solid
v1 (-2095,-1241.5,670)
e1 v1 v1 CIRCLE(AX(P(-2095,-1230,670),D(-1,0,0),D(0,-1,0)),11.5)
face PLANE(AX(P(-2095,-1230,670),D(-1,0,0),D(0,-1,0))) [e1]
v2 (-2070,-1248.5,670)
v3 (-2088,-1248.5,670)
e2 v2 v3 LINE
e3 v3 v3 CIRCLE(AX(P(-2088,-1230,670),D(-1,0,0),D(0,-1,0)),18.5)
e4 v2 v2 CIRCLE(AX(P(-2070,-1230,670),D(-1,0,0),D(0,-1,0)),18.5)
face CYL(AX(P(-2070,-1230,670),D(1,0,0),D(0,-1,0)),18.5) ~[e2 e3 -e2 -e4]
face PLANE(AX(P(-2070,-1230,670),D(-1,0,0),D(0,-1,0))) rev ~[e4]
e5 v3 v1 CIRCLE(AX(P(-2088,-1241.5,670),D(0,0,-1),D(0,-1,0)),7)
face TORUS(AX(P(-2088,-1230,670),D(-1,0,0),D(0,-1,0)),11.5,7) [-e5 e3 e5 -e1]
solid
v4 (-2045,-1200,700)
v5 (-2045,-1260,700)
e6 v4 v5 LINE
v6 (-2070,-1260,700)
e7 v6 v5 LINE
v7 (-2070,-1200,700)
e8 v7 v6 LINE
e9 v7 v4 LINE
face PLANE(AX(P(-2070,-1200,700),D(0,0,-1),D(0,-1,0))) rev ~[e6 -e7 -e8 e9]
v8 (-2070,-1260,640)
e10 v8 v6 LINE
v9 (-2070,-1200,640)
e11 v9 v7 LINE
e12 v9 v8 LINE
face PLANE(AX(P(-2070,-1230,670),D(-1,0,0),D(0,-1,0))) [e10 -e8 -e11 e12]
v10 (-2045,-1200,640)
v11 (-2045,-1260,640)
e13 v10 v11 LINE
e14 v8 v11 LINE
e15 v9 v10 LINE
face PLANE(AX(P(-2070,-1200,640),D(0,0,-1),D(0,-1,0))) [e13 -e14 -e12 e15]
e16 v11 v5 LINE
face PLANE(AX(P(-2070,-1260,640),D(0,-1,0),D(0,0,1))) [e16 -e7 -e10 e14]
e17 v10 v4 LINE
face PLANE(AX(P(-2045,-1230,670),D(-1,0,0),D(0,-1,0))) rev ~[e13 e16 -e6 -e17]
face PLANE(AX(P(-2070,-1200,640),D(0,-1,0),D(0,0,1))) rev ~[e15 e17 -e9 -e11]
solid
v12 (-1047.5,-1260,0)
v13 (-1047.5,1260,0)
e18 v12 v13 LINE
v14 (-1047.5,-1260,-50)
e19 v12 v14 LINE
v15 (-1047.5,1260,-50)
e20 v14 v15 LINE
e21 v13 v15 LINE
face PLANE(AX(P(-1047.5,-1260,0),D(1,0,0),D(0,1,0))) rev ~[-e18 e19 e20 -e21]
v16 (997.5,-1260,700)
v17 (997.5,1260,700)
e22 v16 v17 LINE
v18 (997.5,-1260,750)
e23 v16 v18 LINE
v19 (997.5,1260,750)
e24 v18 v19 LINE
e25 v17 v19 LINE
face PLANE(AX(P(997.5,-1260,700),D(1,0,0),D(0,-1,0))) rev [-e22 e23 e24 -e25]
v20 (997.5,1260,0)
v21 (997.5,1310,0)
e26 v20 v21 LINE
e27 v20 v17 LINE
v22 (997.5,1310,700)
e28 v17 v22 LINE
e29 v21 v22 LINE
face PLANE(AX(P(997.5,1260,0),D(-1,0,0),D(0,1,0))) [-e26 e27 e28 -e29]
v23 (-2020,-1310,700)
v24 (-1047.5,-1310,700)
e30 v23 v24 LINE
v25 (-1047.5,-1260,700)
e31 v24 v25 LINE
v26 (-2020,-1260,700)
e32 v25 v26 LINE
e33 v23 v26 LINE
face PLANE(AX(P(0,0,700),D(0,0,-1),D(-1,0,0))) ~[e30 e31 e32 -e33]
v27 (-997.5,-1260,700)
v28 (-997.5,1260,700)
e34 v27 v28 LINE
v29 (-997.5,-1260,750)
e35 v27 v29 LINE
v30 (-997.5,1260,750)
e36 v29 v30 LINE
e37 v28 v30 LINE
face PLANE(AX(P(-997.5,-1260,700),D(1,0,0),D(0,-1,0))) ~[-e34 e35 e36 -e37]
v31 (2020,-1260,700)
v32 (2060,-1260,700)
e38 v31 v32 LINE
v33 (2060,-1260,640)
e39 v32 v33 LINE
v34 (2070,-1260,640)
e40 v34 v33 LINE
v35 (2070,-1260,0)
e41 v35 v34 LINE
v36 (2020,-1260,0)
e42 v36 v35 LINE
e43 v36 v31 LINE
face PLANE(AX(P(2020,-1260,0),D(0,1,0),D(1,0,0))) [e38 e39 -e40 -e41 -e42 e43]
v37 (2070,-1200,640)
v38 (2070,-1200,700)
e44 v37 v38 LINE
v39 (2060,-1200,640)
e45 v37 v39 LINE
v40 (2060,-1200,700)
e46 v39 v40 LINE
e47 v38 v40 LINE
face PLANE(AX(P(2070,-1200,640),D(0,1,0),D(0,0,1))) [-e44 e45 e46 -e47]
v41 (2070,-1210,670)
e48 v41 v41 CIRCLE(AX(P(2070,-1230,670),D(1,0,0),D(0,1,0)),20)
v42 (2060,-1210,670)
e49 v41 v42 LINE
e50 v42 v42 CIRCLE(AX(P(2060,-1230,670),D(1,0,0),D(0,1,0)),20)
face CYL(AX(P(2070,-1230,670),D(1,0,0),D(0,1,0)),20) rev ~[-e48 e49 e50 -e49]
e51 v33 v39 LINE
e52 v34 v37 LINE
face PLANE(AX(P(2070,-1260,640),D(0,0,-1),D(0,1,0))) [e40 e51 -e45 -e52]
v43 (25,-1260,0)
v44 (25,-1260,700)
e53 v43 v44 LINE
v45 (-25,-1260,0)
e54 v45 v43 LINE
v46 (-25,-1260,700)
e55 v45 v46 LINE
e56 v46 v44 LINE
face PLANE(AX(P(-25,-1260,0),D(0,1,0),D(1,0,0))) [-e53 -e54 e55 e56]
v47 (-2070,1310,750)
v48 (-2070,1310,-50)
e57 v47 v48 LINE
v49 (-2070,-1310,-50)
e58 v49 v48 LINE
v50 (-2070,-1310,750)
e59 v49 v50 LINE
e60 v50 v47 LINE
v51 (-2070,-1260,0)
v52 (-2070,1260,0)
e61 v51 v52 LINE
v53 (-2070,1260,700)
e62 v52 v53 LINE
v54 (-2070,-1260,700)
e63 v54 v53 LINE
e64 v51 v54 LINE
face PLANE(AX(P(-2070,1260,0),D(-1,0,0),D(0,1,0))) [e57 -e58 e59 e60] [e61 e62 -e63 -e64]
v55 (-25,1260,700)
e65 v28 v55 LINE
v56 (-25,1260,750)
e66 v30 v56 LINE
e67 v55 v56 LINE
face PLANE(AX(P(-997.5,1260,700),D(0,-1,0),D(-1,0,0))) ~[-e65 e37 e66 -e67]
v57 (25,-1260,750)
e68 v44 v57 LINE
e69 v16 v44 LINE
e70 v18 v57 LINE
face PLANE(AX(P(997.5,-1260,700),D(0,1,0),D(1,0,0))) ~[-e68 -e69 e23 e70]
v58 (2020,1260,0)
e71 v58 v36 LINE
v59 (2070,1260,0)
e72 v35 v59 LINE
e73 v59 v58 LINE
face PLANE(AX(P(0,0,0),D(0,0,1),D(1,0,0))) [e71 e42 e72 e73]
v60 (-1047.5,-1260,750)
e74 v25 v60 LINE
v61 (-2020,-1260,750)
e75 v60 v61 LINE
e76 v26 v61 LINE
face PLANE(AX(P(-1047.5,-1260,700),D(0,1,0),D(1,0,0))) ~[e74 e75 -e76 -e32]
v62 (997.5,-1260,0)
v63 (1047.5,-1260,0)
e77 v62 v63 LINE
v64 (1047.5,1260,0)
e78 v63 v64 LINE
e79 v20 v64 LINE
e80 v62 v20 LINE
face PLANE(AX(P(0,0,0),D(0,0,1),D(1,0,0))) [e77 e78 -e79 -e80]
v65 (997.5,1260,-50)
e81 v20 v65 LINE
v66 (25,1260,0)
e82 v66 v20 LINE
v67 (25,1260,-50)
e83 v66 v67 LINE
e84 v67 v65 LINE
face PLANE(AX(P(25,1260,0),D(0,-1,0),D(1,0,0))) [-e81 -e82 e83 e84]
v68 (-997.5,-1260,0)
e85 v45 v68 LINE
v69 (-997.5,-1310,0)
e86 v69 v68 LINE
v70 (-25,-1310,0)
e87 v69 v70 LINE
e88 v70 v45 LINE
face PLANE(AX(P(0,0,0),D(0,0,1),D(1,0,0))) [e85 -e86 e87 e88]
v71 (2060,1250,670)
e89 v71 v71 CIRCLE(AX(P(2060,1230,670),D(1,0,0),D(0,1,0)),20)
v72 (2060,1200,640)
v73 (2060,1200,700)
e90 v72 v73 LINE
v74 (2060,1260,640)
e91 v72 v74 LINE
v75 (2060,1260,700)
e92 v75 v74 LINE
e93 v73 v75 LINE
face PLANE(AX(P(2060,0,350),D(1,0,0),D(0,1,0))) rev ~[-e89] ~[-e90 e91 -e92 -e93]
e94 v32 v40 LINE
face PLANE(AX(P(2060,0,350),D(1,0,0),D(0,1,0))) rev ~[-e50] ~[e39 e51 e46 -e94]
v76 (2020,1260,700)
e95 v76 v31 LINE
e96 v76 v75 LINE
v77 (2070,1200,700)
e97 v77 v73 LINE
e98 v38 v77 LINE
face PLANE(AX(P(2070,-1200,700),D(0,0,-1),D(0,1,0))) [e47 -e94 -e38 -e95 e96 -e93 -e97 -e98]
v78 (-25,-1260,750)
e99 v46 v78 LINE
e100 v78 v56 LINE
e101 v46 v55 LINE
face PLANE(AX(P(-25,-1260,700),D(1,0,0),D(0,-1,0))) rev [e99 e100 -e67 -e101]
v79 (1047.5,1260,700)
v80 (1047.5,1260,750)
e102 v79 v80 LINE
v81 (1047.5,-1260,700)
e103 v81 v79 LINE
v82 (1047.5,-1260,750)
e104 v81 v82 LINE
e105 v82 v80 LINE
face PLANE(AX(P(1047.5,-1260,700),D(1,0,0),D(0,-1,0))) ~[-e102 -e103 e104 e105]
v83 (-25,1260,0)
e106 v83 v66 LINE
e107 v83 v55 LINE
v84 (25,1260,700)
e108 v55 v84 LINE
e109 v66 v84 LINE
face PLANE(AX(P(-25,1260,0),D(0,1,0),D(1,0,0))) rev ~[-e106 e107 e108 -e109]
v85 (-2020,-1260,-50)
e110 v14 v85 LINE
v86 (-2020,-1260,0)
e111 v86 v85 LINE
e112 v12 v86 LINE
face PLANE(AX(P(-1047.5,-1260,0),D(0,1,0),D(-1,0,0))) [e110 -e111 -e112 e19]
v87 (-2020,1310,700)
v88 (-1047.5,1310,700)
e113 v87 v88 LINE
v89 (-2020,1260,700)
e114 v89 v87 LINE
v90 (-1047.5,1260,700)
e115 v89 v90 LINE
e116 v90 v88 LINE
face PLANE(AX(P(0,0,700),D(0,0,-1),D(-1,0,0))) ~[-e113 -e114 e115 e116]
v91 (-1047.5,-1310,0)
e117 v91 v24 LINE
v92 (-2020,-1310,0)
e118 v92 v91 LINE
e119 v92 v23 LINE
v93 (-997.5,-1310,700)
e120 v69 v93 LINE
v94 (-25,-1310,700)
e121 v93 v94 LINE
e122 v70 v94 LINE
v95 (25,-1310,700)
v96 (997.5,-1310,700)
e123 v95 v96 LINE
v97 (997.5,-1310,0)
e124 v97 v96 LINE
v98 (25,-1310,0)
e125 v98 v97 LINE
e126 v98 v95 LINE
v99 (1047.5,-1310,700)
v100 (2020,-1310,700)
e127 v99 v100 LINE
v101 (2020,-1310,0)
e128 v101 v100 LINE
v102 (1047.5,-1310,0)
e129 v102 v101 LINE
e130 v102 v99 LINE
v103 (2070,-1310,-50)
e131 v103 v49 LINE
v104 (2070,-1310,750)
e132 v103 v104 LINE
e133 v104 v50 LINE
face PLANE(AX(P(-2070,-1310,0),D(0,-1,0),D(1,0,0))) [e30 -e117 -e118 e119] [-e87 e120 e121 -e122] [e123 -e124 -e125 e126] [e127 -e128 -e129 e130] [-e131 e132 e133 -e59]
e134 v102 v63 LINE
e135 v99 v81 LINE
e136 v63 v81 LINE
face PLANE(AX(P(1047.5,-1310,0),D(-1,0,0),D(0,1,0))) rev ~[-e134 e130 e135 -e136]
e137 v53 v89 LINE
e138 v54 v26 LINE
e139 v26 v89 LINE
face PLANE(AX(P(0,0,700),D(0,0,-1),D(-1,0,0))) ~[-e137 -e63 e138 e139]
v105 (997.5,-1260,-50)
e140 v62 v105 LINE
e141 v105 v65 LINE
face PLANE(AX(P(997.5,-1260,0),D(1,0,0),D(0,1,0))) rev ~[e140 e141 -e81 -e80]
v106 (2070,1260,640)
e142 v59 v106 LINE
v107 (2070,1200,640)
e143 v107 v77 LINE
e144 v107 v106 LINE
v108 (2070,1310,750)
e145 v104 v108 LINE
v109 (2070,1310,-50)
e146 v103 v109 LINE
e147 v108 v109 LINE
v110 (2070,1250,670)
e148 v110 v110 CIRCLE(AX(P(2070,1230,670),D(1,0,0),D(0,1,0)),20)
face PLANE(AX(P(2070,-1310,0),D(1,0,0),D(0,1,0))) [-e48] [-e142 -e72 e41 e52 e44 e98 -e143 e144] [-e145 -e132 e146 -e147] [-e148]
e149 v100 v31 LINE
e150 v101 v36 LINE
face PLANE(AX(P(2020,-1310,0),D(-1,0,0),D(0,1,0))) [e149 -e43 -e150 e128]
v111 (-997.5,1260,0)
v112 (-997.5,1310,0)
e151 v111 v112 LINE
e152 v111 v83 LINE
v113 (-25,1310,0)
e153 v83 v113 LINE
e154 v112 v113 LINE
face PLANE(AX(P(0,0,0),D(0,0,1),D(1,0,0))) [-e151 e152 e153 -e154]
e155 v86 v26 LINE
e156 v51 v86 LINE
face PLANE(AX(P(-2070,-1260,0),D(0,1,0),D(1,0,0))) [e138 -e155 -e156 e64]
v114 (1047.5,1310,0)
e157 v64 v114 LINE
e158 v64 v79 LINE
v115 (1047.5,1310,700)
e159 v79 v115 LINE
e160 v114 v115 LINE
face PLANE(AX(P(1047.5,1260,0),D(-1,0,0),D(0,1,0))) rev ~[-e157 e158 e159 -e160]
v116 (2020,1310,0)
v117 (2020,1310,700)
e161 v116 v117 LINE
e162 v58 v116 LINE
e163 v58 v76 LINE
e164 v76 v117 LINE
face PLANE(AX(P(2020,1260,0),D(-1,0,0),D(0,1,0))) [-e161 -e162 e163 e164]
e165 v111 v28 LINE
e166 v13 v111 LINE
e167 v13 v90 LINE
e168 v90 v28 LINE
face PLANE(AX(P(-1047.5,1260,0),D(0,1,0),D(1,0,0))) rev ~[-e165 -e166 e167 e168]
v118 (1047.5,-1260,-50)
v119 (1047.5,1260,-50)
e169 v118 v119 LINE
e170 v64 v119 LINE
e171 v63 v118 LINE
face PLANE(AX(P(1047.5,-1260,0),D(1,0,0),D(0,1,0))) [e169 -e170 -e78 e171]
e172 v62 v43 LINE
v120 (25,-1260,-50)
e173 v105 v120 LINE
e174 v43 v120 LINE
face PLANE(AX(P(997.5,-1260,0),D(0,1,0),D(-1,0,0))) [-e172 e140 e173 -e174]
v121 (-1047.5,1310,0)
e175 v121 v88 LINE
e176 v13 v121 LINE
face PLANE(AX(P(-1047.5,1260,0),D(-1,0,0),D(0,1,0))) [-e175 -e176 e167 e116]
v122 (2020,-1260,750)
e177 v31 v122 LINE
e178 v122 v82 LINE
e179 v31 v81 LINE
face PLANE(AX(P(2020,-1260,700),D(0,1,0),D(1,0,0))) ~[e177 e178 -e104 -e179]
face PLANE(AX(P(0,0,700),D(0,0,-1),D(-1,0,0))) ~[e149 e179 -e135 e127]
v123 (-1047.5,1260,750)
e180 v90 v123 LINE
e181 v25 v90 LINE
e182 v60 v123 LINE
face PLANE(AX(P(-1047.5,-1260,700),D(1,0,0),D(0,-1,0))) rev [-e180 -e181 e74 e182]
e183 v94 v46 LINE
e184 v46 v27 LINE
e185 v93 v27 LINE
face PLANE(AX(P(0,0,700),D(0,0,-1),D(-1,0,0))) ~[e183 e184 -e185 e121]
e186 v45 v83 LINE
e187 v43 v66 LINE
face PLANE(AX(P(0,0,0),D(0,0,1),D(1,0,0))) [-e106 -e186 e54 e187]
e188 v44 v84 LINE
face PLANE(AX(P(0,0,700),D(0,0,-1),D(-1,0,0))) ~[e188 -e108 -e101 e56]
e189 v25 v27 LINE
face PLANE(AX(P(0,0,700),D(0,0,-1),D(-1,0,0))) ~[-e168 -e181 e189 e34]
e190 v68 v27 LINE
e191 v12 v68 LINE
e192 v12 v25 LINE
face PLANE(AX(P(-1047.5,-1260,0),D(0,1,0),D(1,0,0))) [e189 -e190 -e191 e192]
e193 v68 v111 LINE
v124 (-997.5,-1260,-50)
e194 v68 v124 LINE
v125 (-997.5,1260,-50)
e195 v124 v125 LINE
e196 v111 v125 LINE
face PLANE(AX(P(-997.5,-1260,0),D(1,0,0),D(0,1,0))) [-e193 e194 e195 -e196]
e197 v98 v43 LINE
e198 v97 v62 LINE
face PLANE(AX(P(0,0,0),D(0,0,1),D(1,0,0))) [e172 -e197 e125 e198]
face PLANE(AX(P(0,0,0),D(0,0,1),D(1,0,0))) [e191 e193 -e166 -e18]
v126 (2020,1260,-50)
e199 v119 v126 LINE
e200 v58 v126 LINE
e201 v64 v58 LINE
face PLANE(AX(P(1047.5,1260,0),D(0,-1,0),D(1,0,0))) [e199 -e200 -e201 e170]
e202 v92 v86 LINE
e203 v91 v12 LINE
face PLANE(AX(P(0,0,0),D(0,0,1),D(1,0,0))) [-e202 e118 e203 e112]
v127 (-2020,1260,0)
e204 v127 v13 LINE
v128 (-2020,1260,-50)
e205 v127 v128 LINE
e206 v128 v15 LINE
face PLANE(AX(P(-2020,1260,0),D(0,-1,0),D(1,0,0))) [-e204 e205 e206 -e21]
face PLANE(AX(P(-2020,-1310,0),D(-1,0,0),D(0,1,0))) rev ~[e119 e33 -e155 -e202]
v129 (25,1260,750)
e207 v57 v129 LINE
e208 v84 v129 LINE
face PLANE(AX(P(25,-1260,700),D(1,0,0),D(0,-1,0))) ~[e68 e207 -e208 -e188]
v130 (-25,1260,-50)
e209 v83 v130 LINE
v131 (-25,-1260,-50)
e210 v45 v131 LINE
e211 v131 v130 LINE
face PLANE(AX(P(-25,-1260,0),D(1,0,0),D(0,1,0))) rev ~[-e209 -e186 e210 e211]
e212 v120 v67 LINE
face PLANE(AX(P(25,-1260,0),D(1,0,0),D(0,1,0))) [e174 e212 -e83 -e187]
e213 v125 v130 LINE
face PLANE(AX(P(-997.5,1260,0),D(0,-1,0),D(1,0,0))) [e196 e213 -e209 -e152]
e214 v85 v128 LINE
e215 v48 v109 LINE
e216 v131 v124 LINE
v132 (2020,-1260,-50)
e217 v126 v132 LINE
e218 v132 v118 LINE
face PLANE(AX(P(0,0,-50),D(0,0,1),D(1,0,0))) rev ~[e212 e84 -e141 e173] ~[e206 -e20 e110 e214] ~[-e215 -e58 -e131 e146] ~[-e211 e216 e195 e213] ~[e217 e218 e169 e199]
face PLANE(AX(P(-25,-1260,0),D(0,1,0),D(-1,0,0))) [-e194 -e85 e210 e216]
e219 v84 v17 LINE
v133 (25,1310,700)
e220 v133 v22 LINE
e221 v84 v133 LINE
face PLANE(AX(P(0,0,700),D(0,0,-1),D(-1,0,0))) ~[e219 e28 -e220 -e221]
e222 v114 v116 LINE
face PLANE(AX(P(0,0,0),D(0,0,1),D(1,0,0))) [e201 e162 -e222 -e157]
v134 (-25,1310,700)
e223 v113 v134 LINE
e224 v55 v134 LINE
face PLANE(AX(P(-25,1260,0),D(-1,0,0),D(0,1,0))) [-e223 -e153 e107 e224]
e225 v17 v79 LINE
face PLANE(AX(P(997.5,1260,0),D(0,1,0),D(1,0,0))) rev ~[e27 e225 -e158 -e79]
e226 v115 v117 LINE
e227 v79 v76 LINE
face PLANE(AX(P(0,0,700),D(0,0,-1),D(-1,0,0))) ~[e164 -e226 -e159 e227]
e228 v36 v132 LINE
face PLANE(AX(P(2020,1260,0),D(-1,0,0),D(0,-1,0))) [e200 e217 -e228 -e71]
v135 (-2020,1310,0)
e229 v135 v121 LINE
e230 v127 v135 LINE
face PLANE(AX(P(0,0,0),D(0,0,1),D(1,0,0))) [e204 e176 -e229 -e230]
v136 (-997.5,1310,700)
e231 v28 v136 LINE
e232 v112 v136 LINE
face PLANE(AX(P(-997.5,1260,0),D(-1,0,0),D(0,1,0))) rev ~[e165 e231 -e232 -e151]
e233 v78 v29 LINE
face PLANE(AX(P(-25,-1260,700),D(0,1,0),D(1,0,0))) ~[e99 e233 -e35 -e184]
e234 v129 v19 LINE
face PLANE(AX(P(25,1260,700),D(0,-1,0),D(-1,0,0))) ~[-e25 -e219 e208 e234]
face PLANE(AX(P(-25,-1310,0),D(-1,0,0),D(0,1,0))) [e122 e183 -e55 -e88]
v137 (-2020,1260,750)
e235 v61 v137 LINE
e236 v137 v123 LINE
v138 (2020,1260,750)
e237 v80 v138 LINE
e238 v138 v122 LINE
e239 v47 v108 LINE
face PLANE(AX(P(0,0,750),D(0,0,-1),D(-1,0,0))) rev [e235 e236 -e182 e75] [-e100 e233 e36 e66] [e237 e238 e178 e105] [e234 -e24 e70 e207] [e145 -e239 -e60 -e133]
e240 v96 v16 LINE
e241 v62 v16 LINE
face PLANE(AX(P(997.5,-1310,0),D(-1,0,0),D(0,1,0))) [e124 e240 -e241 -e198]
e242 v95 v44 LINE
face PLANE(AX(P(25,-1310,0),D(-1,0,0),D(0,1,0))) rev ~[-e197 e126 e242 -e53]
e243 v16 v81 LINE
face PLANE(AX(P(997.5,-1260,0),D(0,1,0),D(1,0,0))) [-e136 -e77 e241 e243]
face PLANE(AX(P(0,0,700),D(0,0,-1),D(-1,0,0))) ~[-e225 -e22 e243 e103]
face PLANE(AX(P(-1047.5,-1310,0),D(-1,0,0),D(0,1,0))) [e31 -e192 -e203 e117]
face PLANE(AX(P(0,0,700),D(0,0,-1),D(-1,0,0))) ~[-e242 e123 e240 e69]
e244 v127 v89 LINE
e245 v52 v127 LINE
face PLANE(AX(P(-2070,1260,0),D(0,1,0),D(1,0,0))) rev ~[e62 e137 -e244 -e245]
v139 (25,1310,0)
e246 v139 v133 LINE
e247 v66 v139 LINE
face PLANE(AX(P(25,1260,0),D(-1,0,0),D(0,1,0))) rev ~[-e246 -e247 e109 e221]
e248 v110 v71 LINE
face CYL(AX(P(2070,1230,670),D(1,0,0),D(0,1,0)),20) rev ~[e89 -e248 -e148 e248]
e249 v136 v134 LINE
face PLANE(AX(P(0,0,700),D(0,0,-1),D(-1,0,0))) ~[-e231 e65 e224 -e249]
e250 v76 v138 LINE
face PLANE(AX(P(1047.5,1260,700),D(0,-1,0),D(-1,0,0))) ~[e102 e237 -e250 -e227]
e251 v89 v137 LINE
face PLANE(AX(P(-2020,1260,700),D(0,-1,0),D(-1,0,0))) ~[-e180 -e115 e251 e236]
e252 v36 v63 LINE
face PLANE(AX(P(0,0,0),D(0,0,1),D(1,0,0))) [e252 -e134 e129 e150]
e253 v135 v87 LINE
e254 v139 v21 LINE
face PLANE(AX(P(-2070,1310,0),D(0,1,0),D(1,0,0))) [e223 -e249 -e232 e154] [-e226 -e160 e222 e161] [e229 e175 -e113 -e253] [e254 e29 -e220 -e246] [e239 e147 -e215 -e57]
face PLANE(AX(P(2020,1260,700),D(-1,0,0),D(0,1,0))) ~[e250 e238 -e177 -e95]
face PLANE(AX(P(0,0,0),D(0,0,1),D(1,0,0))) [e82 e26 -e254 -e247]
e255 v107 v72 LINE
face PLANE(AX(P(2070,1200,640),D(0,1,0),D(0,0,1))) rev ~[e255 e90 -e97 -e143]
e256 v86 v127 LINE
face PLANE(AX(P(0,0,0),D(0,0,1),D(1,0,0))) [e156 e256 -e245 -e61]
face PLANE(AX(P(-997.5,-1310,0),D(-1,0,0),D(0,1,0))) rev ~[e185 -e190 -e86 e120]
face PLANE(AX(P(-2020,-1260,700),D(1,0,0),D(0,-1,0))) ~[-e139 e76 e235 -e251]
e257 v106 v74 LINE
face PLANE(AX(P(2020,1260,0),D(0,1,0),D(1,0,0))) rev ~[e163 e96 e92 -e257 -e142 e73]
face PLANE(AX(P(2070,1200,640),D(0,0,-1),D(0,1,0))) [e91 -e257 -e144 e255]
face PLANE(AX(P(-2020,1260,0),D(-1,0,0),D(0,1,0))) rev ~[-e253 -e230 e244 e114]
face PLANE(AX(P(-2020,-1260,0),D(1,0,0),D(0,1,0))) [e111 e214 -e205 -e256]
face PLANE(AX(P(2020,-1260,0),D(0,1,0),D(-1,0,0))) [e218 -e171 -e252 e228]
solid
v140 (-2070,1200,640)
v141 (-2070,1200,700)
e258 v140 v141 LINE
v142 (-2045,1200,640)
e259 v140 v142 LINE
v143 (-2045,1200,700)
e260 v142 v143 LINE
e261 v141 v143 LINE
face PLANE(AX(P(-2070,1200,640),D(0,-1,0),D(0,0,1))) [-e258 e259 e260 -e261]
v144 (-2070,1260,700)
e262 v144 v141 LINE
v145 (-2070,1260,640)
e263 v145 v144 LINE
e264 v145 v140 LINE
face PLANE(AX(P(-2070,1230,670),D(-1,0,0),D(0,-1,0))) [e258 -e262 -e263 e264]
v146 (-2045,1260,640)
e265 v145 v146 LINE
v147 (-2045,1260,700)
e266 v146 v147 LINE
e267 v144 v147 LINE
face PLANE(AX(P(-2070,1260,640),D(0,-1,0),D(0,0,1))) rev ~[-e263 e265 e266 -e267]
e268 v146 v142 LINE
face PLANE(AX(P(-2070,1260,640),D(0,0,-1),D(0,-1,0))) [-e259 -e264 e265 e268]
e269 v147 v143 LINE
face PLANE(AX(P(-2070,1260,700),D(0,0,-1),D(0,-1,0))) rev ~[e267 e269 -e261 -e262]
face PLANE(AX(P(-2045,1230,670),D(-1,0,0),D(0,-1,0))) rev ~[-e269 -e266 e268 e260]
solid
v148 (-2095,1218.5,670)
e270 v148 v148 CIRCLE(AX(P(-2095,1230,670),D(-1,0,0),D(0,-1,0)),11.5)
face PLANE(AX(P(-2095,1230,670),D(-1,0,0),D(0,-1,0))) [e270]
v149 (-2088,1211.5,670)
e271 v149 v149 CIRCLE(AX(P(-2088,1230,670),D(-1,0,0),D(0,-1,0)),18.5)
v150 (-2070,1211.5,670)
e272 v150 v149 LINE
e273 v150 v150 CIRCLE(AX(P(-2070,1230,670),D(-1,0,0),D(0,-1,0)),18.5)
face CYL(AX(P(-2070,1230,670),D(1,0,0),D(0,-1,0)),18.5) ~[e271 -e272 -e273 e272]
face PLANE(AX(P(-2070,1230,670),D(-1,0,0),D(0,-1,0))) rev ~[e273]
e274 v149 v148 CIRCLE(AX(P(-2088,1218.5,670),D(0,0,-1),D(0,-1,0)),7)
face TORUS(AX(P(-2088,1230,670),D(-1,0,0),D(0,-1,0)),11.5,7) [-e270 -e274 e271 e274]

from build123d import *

# Parameters (mm, degrees)
F0_W      = 4140
F0_H      = 2620
F0_W_2    = 50
F0_H_2    = 2520
F1_DEPTH  = 50
F2_W      = 50
F2_H      = 50
F3_DEPTH  = 700
F7_W      = 2620
F7_H      = 800
F7_W_2    = 60
F7_H_2    = 60
F7_R      = 20
F8_DEPTH  = 10
F9_W      = 60
F9_H      = 60
F9_R      = 18.5
F10_DEPTH = 25
F11_DEPTH = 25
F12_R     = 7
F12_2_R   = 7


# Not quite as in the source:
# - a feature names something its author has since deleted; it is built from what else it names


with BuildPart() as f1:
    # F0 (on Top) → F1 (new body)
    with BuildSketch(Plane.XY):
        Rectangle(F0_W, F0_H)
        Polygon((1047.5, 1260), (2020, 1260), (2020, -1260), (1047.5, -1260), (997.5, -1260), (25, -1260), (-25, -1260), (-997.5, -1260), (-1047.5, -1260), (-2020, -1260), (-2020, 1260), (-1047.5, 1260), (-997.5, 1260), (-25, 1260), (25, 1260), (997.5, 1260), align=None, mode=Mode.SUBTRACT)
        with Locations((-1022.5, 0)):
            Rectangle(F0_W_2, F0_H_2)
        Rectangle(F0_W_2, F0_H_2)
        with Locations((1022.5, 0)):
            Rectangle(F0_W_2, F0_H_2)
    extrude(amount=-F1_DEPTH)

    # F2 (on face) → F3 (join)
    with BuildSketch(Plane.XY):
        with Locations((-2045, 1285)):
            Rectangle(F2_W, F2_H)
        with Locations((-1022.5, 1285)):
            Rectangle(F2_W, F2_H)
        with Locations((0, 1285)):
            Rectangle(F2_W, F2_H)
        with Locations((1022.5, 1285)):
            Rectangle(F2_W, F2_H)
        with Locations((2045, 1285)):
            Rectangle(F2_W, F2_H)
        with Locations((2045, -1285)):
            Rectangle(F2_W, F2_H)
        with Locations((1022.5, -1285)):
            Rectangle(F2_W, F2_H)
        with Locations((0, -1285)):
            Rectangle(F2_W, F2_H)
        with Locations((-1022.5, -1285)):
            Rectangle(F2_W, F2_H)
        with Locations((-2045, -1285)):
            Rectangle(F2_W, F2_H)
    extrude(amount=F3_DEPTH)

    # F6: F1 across plane


with BuildPart() as f1_1:
    add(f1.part)
    add(f1.part.mirror(Plane.XY.offset(350)))

    # F7 (on face) → F8 (join)
    with BuildSketch(Plane.YZ.offset(2070)):
        with Locations((0, 350)):
            Rectangle(F7_W, F7_H)
        Polygon((1200, 700), (1260, 700), (1260, 640), (1260, 0), (-1260, 0), (-1260, 640), (-1260, 700), (-1200, 700), align=None, mode=Mode.SUBTRACT)
        with Locations((1230, 670)):
            Rectangle(F7_W_2, F7_H_2)
        with Locations((1230, 670)):
            Circle(F7_R, mode=Mode.SUBTRACT)
        with Locations((-1230, 670)):
            Rectangle(F7_W_2, F7_H_2)
        with Locations((-1230, 670)):
            Circle(F7_R, mode=Mode.SUBTRACT)
    extrude(amount=-F8_DEPTH)


with BuildPart() as f10:
    # F9 (on face) → F10 (new body)
    with BuildSketch(Plane(origin=(-2070, 0, 0), x_dir=(0, -1, 0), z_dir=(-1, 0, 0))):
        with Locations((-1230, 670)):
            Rectangle(F9_W, F9_H)
        with Locations((-1230, 670)):
            Circle(F9_R, mode=Mode.SUBTRACT)
        with Locations((-1230, 670)):
            Circle(F9_R)
    extrude(amount=-F10_DEPTH)


with BuildPart() as f10b:
    # F9 (on face) → F10, piece 2 (new body)
    with BuildSketch(Plane(origin=(-2070, 0, 0), x_dir=(0, -1, 0), z_dir=(-1, 0, 0))):
        with Locations((1230, 670)):
            Rectangle(F9_W, F9_H)
        with Locations((1230, 670)):
            Circle(F9_R, mode=Mode.SUBTRACT)
        with Locations((1230, 670)):
            Circle(F9_R)
    extrude(amount=-F10_DEPTH)


with BuildPart() as f11:
    # F9 (on face) → F11 (new body)
    with BuildSketch(Plane(origin=(-2070, 0, 0), x_dir=(0, -1, 0), z_dir=(-1, 0, 0))):
        with Locations((-1230, 670)):
            Circle(F9_R)
    extrude(amount=F11_DEPTH)

    # F12
    f12_edges = [f11.edges().sort_by_distance(p)[0] for p in [
        (-2095, 1248.5, 670),
    ]]
    fillet(f12_edges, radius=F12_R)


with BuildPart() as f11b:
    # F9 (on face) → F11, piece 2 (new body)
    with BuildSketch(Plane(origin=(-2070, 0, 0), x_dir=(0, -1, 0), z_dir=(-1, 0, 0))):
        with Locations((1230, 670)):
            Circle(F9_R)
    extrude(amount=F11_DEPTH)

    # F12#2
    f12_2_edges = [f11b.edges().sort_by_distance(p)[0] for p in [
        (-2095, -1211.5, 670),
    ]]
    fillet(f12_2_edges, radius=F12_2_R)


solid = Compound([f1_1.part, f10.part, f10b.part, f11.part, f11b.part])
